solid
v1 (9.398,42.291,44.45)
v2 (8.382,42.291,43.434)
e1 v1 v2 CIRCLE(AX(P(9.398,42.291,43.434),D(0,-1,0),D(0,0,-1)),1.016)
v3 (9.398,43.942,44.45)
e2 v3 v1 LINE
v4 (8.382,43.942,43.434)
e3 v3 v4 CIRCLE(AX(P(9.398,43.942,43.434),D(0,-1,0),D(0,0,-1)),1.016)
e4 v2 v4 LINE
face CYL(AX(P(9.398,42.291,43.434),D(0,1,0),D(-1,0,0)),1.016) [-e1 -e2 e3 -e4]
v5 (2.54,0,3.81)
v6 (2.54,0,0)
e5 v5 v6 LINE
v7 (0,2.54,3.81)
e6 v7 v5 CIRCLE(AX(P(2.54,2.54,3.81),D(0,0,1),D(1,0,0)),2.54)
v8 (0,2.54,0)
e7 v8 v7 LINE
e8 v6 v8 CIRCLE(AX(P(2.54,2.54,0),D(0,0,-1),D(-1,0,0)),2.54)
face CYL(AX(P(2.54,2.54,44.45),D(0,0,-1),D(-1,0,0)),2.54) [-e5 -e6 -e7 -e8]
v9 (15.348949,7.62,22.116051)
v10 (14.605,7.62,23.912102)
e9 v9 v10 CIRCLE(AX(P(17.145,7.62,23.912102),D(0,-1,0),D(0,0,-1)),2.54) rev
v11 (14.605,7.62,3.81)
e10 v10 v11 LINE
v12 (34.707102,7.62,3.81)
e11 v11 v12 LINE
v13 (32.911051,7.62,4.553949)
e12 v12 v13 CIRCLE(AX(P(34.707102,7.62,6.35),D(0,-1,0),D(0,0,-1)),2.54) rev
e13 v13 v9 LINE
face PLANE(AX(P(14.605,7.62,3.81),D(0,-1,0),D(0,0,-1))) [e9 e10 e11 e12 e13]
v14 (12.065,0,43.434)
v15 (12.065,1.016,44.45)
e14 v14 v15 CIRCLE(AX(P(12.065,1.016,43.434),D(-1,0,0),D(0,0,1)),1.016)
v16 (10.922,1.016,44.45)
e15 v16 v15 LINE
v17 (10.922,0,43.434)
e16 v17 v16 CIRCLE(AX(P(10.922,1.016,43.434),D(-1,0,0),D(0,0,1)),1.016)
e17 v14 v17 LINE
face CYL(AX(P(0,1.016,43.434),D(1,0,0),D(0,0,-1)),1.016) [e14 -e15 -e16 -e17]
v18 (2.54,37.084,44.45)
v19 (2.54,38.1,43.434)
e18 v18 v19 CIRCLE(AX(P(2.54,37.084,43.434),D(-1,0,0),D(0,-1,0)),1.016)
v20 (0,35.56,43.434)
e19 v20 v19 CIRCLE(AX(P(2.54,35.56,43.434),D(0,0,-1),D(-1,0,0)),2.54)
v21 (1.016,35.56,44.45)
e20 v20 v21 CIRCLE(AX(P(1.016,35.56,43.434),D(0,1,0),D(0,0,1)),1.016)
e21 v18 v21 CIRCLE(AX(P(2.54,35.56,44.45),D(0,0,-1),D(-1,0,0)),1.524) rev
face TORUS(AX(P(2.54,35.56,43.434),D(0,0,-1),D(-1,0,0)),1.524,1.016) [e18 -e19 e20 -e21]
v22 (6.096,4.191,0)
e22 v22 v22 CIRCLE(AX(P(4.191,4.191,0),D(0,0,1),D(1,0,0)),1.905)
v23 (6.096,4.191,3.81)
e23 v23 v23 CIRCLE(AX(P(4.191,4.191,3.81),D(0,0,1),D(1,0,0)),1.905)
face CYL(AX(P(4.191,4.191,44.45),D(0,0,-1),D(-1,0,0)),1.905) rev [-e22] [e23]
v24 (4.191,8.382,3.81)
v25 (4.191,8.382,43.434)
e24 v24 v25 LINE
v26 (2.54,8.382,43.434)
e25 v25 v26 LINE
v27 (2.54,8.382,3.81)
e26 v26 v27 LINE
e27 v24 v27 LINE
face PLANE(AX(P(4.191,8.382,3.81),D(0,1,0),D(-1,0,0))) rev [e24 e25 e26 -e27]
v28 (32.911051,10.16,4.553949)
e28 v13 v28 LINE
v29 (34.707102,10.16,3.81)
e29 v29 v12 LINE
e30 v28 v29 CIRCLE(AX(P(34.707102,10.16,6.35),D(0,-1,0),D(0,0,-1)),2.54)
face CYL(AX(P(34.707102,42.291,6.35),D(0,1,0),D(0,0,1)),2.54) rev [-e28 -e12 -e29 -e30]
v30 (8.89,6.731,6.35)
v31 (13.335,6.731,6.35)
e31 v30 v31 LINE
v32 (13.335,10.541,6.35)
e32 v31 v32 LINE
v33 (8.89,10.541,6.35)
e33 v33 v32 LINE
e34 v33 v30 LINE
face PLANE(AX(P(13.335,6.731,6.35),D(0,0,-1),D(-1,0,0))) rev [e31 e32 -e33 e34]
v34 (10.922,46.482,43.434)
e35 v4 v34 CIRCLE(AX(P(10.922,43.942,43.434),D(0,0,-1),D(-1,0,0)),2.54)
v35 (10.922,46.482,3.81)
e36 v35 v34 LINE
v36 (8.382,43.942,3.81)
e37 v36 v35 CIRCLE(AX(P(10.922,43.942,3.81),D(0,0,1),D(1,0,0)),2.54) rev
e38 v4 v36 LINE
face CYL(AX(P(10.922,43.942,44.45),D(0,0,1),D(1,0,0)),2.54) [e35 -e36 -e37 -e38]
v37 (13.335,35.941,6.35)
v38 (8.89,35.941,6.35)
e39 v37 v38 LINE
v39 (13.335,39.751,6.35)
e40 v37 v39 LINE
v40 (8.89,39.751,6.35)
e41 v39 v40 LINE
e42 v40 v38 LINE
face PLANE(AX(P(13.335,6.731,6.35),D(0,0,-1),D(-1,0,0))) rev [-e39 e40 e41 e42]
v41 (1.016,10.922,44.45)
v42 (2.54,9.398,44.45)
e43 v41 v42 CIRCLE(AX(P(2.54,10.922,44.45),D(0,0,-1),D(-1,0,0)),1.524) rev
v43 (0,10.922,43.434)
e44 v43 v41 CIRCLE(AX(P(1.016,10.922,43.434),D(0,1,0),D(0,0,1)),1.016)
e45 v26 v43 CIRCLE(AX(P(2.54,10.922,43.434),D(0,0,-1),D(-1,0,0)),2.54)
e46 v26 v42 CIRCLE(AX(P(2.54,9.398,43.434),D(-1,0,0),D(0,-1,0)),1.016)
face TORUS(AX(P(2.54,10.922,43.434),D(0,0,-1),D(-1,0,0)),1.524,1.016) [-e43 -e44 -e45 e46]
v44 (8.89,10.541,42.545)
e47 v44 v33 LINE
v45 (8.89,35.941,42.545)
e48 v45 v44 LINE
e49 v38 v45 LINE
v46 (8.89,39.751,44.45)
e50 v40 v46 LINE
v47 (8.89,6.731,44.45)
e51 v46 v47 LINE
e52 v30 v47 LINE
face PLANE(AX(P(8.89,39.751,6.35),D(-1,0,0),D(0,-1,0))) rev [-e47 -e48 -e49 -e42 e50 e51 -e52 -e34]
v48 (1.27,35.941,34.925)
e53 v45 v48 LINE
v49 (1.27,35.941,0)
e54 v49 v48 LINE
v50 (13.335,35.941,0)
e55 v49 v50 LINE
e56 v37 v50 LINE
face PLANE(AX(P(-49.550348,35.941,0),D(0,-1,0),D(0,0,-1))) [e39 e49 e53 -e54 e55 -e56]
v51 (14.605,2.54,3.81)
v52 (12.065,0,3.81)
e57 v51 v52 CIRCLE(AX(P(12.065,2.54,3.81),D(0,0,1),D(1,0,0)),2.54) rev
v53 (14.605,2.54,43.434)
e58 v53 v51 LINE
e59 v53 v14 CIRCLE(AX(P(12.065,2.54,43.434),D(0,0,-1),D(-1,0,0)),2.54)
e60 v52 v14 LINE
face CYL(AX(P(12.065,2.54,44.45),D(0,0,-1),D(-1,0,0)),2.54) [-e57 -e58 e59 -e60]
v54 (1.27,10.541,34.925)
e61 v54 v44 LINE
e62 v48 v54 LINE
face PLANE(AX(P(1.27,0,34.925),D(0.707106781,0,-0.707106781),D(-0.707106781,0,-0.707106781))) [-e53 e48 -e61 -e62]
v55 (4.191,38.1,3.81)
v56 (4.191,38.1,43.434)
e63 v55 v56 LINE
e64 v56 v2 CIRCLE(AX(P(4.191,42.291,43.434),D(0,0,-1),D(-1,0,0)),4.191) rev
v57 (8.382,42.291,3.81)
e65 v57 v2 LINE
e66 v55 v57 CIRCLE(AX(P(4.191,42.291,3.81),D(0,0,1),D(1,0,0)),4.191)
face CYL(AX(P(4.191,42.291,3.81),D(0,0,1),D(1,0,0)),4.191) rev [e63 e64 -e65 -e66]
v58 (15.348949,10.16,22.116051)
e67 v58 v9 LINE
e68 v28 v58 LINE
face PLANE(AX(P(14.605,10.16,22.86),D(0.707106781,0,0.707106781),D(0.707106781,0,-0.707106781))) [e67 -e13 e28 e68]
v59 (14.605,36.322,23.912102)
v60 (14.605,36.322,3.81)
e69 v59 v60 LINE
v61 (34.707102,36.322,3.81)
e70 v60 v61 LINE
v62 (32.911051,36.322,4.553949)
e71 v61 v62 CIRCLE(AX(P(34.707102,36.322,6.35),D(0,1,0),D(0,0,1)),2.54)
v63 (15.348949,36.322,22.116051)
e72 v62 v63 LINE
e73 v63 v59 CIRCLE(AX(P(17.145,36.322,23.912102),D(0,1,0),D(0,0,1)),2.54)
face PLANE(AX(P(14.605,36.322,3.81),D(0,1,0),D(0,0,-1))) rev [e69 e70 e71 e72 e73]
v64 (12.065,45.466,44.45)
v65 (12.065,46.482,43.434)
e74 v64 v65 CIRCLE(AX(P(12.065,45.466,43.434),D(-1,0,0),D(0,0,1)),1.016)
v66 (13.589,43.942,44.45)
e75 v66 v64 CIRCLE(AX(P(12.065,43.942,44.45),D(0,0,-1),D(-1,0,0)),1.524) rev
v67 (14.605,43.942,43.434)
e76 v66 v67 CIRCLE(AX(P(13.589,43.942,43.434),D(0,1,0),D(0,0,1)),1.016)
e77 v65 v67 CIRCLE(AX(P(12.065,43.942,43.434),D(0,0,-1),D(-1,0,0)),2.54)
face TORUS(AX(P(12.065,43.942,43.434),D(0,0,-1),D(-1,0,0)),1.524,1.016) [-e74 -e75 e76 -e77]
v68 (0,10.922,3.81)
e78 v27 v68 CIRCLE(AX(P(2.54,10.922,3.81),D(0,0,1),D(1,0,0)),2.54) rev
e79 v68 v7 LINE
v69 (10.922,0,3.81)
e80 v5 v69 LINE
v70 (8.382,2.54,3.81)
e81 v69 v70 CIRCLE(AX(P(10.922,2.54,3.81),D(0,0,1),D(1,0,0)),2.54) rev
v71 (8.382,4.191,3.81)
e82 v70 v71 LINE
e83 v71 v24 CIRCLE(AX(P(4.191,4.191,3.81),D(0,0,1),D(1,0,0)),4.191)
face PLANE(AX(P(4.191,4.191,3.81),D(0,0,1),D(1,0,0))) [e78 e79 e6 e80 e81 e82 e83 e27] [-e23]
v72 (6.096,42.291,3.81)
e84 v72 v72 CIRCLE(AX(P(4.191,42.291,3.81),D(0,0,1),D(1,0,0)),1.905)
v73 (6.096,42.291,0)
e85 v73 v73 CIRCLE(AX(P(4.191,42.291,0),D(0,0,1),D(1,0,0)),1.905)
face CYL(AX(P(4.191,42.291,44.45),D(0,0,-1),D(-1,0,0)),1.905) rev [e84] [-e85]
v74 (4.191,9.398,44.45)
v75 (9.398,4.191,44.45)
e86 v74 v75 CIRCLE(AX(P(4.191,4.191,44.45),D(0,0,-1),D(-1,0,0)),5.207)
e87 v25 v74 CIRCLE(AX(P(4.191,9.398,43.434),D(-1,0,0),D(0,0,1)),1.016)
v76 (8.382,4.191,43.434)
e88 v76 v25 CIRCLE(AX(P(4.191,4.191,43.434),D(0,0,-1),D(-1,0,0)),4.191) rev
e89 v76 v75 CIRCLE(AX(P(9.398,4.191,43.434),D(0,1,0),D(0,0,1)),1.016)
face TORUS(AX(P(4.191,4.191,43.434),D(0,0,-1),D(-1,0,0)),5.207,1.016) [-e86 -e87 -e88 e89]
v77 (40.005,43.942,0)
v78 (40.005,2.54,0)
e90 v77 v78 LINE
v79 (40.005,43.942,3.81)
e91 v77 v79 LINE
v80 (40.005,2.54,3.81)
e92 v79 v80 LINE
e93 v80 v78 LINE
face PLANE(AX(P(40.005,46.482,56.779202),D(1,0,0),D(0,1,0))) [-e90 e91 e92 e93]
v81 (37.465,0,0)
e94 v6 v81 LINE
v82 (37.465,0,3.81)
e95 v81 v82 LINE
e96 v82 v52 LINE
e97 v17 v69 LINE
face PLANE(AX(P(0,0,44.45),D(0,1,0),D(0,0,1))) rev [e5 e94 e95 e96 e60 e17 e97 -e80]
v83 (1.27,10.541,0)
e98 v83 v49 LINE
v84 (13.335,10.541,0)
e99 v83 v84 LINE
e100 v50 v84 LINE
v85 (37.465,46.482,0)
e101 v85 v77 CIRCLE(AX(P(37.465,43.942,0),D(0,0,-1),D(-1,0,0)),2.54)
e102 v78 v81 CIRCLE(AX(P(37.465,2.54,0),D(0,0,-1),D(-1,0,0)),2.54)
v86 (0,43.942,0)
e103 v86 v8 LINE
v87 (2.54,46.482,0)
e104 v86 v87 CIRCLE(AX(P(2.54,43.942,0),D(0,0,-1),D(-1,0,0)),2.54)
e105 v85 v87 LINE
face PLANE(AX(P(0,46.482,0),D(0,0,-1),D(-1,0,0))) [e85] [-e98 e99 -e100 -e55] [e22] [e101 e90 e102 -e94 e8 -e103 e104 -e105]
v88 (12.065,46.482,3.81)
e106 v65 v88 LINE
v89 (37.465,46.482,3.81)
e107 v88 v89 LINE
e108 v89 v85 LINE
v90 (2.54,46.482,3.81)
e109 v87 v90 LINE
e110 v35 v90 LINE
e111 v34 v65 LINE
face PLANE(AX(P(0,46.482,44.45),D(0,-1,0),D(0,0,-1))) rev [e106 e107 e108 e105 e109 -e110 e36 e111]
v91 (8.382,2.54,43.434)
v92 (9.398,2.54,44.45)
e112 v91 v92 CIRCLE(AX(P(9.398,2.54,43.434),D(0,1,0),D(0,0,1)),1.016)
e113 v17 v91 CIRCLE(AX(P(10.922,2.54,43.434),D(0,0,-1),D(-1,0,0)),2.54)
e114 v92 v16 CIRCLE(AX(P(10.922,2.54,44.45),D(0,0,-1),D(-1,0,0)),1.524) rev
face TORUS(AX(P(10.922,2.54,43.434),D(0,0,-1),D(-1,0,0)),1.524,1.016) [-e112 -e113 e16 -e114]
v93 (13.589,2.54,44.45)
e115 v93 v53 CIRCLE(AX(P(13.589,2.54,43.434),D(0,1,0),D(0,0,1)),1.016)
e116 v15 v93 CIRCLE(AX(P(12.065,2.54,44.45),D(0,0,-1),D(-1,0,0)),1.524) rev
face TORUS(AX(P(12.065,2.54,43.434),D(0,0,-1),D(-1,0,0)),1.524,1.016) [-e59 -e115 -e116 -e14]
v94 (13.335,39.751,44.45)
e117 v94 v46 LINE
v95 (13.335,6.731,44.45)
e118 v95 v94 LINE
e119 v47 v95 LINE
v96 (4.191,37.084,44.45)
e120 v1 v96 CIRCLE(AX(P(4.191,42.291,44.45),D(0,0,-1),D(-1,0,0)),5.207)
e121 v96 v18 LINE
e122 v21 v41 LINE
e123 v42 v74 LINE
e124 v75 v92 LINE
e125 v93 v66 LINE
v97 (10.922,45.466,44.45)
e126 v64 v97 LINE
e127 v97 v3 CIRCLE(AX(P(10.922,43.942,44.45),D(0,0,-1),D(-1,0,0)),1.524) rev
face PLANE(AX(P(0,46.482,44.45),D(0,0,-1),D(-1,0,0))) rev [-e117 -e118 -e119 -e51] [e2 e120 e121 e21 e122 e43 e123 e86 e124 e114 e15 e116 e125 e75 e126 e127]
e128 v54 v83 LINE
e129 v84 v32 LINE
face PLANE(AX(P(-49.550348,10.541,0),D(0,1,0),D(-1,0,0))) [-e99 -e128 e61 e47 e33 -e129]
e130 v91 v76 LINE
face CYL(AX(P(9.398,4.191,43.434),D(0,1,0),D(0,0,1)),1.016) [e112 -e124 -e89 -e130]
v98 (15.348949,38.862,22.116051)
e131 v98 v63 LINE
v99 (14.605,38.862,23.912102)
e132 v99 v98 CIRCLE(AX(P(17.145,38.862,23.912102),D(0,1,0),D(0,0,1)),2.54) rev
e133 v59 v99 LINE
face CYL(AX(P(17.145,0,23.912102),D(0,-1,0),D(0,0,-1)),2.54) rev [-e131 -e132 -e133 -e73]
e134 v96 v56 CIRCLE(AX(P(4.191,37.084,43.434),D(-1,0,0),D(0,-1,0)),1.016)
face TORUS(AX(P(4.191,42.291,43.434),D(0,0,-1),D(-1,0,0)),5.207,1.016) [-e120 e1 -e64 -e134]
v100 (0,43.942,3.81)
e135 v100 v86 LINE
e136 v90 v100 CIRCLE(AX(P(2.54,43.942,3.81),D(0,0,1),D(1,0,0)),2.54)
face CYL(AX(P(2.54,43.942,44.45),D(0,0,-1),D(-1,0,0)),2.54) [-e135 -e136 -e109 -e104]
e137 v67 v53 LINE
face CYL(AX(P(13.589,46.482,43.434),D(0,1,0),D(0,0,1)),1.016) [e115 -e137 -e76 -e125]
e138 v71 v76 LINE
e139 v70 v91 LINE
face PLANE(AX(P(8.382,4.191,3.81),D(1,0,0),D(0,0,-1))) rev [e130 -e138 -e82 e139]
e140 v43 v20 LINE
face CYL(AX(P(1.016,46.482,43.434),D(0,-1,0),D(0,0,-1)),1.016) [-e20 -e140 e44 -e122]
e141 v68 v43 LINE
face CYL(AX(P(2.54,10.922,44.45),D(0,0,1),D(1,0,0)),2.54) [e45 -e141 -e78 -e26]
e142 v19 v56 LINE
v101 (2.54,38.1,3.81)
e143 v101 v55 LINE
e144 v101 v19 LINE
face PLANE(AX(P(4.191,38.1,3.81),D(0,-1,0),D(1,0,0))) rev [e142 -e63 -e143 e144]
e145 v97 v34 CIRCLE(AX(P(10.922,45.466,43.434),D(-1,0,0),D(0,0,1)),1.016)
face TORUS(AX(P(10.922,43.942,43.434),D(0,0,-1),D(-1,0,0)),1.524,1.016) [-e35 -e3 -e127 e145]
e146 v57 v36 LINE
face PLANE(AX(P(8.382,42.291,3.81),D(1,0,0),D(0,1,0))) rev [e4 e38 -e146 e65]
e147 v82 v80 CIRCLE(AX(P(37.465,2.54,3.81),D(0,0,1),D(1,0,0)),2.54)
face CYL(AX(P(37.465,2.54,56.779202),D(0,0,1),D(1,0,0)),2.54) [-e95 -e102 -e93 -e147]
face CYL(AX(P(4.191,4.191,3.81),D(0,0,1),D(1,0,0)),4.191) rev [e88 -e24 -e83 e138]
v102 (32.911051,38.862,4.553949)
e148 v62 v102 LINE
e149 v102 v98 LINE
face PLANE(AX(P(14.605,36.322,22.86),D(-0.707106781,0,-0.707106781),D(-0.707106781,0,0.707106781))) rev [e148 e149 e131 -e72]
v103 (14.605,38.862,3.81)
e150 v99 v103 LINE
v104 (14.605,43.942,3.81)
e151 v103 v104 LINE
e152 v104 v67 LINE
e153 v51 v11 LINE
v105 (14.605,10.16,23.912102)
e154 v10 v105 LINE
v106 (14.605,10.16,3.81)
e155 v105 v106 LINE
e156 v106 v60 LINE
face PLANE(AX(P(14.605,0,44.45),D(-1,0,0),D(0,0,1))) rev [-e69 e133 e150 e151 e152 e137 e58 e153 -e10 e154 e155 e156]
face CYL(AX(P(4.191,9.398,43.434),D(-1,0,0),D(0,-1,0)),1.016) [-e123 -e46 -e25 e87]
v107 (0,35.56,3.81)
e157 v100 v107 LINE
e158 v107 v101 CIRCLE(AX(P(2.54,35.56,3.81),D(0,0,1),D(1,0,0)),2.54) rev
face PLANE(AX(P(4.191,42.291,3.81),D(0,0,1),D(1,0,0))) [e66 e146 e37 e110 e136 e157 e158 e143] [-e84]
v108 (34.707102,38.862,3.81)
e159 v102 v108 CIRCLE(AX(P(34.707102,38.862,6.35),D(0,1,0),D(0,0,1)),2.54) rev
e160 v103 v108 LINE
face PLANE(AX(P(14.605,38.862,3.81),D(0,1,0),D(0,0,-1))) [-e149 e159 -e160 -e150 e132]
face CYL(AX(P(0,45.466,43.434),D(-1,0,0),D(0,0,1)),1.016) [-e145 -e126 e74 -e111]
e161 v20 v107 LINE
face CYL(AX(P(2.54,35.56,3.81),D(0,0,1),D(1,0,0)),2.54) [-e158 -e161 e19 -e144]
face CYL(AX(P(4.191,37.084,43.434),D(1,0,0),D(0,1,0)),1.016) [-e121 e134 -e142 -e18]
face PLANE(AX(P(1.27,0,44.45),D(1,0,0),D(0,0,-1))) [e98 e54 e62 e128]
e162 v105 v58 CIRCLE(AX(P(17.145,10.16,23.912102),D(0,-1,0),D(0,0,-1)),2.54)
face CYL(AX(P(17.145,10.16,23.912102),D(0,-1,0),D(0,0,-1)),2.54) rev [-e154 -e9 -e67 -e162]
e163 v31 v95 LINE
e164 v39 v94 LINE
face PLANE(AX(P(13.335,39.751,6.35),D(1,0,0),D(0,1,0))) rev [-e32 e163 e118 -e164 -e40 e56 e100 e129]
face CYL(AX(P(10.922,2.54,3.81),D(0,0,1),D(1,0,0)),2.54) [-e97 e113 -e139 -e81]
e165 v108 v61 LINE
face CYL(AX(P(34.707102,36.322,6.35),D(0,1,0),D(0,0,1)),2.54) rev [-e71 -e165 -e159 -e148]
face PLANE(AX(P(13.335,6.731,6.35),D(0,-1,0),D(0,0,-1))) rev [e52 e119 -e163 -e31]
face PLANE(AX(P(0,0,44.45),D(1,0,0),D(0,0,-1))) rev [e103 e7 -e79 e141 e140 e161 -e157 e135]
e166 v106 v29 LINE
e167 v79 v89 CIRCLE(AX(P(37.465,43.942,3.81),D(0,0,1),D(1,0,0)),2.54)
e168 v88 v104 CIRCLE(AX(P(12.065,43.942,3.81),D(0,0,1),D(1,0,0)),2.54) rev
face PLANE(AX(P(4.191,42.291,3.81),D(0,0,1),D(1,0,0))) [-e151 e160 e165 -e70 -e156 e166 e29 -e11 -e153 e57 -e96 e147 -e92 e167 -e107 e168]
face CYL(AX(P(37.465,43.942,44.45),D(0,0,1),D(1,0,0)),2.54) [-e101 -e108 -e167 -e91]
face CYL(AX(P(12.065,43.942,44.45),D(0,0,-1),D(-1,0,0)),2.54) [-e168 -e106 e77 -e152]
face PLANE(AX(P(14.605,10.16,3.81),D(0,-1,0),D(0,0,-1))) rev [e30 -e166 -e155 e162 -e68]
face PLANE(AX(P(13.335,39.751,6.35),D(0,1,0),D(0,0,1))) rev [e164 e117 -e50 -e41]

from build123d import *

# Parameters (mm, degrees)
SKETCH1_W           = 14.605
SKETCH1_H           = 46.482
SKETCH1_R           = 1.905
BOSS_EXTRUDE1_DEPTH = 44.45
SKETCH2_W           = 4.445
SKETCH2_H           = 33.02
CUT_EXTRUDE1_DEPTH  = 38.1
SKETCH3_W           = 42.545
SKETCH3_H           = 25.4
CUT_EXTRUDE2_DEPTH  = 12.065
CUT_EXTRUDE3_DEPTH  = 40.64
SKETCH5_W           = 25.4
SKETCH5_H           = 46.482
BOSS_EXTRUDE2_DEPTH = 3.81
FILLET1_R           = 2.54
FILLET2_R           = 1.016
CHAMFER1_SIZE       = 7.62
BOSS_EXTRUDE3_START = -7.62
BOSS_EXTRUDE3_DEPTH = 2.54
FILLET4_R           = 2.54


with BuildPart() as part:
    # Sketch1 → Boss-Extrude1 (new body)
    with BuildSketch(Plane.XY):
        with Locations((7.3025, 23.241)):
            Rectangle(SKETCH1_W, SKETCH1_H)
        with Locations((4.191, 42.291)):
            Circle(SKETCH1_R, mode=Mode.SUBTRACT)
        with Locations((4.191, 4.191)):
            Circle(SKETCH1_R, mode=Mode.SUBTRACT)
    extrude(amount=BOSS_EXTRUDE1_DEPTH)

    # Sketch2 → Cut-Extrude1 (cut)
    with BuildSketch(Plane.XY.offset(44.45)):
        with Locations((11.1125, 23.241)):
            Rectangle(SKETCH2_W, SKETCH2_H)
    extrude(amount=-CUT_EXTRUDE1_DEPTH, mode=Mode.SUBTRACT)

    # Sketch3 → Cut-Extrude2 (cut)
    with BuildSketch(Plane.ZY.offset(-13.335)):
        with Locations((21.2725, 23.241)):
            Rectangle(SKETCH3_W, SKETCH3_H)
    extrude(amount=CUT_EXTRUDE2_DEPTH, mode=Mode.SUBTRACT)

    # Sketch4 → Cut-Extrude3 (cut)
    with BuildSketch(Plane.XY.offset(44.45)):
        with BuildLine():
            Line((4.191, 38.1), (0, 38.1))
            Line((0, 38.1), (0, 46.482))
            Line((0, 46.482), (8.382, 46.482))
            Line((8.382, 46.482), (8.382, 42.291))
            ThreePointArc((8.382, 42.291), (7.15448452, 39.32751548), (4.191, 38.1))
        make_face()
        with BuildLine():
            Line((4.191, 8.382), (0, 8.382))
            Line((0, 8.382), (0, 0))
            Line((0, 0), (8.382, 0))
            Line((8.382, 0), (8.382, 4.191))
            ThreePointArc((8.382, 4.191), (7.15448452, 7.15448452), (4.191, 8.382))
        make_face()
    extrude(amount=-CUT_EXTRUDE3_DEPTH, mode=Mode.SUBTRACT)

    # Sketch5 → Boss-Extrude2 (add)
    with BuildSketch(Plane(origin=(0, 0, 0), x_dir=(-1, 0, 0), z_dir=(0, 0, -1))):
        with Locations((-27.305, 23.241)):
            Rectangle(SKETCH5_W, SKETCH5_H)
    extrude(amount=-BOSS_EXTRUDE2_DEPTH)

    # Fillet1
    fillet1_edges = [part.edges().sort_by_distance(p)[0] for p in [
        (8.382, 46.482, 24.13),
        (0, 38.1, 24.13),
        (0, 8.382, 24.13),
        (8.382, 0, 24.13),
        (0, 0, 1.905),
        (14.605, 0, 24.13),
        (14.605, 46.482, 24.13),
        (0, 46.482, 1.905),
        (40.005, 0, 1.905),
        (40.005, 46.482, 1.905),
    ]]
    fillet(fillet1_edges, radius=FILLET1_R)

    # Fillet2
    fillet2_edges = [part.edges().sort_by_distance(p)[0] for p in [
        (11.4935, 0, 44.45),
        (0, 23.241, 44.45),
        (11.4935, 46.482, 44.45),
        (8.382, 3.3655, 44.45),
        (14.605, 23.241, 44.45),
        (3.3655, 38.1, 44.45),
        (13.861051224, 45.738051224, 44.45),
        (13.861051224, 0.743948776, 44.45),
        (9.125948776, 0.743948776, 44.45),
        (0.743948776, 9.125948776, 44.45),
        (0.743948776, 37.356051224, 44.45),
        (9.125948776, 45.738051224, 44.45),
        (7.15448452, 39.32751548, 44.45),
        (8.382, 43.1165, 44.45),
        (7.15448452, 7.15448452, 44.45),
        (3.3655, 8.382, 44.45),
    ]]
    fillet(fillet2_edges, radius=FILLET2_R)

    # Chamfer1
    chamfer1_edges = [part.edges().sort_by_distance(p)[0] for p in [
        (1.27, 23.241, 42.545),
    ]]
    chamfer(chamfer1_edges, length=CHAMFER1_SIZE - 0.0001)  # a hair under: the kernel refuses the full size

    # Sketch6 → Boss-Extrude3 (add)
    with BuildSketch(Plane.XZ.offset(BOSS_EXTRUDE3_START)):
        Polygon((14.605, 22.86), (33.655, 3.81), (14.605, 3.81), align=None)
    boss_extrude3 = extrude(amount=-BOSS_EXTRUDE3_DEPTH)

    # Mirror1: Boss-Extrude3 across plane
    add(boss_extrude3.mirror(Plane(origin=(0, 23.241, 0), x_dir=(0, 0, 1), z_dir=(0, -1, 0))))

    # Fillet4
    fillet4_edges = [part.edges().sort_by_distance(p)[0] for p in [
        (14.605, 8.89, 22.86),
        (33.655, 8.89, 3.81),
        (14.605, 37.592, 22.86),
        (33.655, 37.592, 3.81),
    ]]
    fillet(fillet4_edges, radius=FILLET4_R)


solid = part.part
